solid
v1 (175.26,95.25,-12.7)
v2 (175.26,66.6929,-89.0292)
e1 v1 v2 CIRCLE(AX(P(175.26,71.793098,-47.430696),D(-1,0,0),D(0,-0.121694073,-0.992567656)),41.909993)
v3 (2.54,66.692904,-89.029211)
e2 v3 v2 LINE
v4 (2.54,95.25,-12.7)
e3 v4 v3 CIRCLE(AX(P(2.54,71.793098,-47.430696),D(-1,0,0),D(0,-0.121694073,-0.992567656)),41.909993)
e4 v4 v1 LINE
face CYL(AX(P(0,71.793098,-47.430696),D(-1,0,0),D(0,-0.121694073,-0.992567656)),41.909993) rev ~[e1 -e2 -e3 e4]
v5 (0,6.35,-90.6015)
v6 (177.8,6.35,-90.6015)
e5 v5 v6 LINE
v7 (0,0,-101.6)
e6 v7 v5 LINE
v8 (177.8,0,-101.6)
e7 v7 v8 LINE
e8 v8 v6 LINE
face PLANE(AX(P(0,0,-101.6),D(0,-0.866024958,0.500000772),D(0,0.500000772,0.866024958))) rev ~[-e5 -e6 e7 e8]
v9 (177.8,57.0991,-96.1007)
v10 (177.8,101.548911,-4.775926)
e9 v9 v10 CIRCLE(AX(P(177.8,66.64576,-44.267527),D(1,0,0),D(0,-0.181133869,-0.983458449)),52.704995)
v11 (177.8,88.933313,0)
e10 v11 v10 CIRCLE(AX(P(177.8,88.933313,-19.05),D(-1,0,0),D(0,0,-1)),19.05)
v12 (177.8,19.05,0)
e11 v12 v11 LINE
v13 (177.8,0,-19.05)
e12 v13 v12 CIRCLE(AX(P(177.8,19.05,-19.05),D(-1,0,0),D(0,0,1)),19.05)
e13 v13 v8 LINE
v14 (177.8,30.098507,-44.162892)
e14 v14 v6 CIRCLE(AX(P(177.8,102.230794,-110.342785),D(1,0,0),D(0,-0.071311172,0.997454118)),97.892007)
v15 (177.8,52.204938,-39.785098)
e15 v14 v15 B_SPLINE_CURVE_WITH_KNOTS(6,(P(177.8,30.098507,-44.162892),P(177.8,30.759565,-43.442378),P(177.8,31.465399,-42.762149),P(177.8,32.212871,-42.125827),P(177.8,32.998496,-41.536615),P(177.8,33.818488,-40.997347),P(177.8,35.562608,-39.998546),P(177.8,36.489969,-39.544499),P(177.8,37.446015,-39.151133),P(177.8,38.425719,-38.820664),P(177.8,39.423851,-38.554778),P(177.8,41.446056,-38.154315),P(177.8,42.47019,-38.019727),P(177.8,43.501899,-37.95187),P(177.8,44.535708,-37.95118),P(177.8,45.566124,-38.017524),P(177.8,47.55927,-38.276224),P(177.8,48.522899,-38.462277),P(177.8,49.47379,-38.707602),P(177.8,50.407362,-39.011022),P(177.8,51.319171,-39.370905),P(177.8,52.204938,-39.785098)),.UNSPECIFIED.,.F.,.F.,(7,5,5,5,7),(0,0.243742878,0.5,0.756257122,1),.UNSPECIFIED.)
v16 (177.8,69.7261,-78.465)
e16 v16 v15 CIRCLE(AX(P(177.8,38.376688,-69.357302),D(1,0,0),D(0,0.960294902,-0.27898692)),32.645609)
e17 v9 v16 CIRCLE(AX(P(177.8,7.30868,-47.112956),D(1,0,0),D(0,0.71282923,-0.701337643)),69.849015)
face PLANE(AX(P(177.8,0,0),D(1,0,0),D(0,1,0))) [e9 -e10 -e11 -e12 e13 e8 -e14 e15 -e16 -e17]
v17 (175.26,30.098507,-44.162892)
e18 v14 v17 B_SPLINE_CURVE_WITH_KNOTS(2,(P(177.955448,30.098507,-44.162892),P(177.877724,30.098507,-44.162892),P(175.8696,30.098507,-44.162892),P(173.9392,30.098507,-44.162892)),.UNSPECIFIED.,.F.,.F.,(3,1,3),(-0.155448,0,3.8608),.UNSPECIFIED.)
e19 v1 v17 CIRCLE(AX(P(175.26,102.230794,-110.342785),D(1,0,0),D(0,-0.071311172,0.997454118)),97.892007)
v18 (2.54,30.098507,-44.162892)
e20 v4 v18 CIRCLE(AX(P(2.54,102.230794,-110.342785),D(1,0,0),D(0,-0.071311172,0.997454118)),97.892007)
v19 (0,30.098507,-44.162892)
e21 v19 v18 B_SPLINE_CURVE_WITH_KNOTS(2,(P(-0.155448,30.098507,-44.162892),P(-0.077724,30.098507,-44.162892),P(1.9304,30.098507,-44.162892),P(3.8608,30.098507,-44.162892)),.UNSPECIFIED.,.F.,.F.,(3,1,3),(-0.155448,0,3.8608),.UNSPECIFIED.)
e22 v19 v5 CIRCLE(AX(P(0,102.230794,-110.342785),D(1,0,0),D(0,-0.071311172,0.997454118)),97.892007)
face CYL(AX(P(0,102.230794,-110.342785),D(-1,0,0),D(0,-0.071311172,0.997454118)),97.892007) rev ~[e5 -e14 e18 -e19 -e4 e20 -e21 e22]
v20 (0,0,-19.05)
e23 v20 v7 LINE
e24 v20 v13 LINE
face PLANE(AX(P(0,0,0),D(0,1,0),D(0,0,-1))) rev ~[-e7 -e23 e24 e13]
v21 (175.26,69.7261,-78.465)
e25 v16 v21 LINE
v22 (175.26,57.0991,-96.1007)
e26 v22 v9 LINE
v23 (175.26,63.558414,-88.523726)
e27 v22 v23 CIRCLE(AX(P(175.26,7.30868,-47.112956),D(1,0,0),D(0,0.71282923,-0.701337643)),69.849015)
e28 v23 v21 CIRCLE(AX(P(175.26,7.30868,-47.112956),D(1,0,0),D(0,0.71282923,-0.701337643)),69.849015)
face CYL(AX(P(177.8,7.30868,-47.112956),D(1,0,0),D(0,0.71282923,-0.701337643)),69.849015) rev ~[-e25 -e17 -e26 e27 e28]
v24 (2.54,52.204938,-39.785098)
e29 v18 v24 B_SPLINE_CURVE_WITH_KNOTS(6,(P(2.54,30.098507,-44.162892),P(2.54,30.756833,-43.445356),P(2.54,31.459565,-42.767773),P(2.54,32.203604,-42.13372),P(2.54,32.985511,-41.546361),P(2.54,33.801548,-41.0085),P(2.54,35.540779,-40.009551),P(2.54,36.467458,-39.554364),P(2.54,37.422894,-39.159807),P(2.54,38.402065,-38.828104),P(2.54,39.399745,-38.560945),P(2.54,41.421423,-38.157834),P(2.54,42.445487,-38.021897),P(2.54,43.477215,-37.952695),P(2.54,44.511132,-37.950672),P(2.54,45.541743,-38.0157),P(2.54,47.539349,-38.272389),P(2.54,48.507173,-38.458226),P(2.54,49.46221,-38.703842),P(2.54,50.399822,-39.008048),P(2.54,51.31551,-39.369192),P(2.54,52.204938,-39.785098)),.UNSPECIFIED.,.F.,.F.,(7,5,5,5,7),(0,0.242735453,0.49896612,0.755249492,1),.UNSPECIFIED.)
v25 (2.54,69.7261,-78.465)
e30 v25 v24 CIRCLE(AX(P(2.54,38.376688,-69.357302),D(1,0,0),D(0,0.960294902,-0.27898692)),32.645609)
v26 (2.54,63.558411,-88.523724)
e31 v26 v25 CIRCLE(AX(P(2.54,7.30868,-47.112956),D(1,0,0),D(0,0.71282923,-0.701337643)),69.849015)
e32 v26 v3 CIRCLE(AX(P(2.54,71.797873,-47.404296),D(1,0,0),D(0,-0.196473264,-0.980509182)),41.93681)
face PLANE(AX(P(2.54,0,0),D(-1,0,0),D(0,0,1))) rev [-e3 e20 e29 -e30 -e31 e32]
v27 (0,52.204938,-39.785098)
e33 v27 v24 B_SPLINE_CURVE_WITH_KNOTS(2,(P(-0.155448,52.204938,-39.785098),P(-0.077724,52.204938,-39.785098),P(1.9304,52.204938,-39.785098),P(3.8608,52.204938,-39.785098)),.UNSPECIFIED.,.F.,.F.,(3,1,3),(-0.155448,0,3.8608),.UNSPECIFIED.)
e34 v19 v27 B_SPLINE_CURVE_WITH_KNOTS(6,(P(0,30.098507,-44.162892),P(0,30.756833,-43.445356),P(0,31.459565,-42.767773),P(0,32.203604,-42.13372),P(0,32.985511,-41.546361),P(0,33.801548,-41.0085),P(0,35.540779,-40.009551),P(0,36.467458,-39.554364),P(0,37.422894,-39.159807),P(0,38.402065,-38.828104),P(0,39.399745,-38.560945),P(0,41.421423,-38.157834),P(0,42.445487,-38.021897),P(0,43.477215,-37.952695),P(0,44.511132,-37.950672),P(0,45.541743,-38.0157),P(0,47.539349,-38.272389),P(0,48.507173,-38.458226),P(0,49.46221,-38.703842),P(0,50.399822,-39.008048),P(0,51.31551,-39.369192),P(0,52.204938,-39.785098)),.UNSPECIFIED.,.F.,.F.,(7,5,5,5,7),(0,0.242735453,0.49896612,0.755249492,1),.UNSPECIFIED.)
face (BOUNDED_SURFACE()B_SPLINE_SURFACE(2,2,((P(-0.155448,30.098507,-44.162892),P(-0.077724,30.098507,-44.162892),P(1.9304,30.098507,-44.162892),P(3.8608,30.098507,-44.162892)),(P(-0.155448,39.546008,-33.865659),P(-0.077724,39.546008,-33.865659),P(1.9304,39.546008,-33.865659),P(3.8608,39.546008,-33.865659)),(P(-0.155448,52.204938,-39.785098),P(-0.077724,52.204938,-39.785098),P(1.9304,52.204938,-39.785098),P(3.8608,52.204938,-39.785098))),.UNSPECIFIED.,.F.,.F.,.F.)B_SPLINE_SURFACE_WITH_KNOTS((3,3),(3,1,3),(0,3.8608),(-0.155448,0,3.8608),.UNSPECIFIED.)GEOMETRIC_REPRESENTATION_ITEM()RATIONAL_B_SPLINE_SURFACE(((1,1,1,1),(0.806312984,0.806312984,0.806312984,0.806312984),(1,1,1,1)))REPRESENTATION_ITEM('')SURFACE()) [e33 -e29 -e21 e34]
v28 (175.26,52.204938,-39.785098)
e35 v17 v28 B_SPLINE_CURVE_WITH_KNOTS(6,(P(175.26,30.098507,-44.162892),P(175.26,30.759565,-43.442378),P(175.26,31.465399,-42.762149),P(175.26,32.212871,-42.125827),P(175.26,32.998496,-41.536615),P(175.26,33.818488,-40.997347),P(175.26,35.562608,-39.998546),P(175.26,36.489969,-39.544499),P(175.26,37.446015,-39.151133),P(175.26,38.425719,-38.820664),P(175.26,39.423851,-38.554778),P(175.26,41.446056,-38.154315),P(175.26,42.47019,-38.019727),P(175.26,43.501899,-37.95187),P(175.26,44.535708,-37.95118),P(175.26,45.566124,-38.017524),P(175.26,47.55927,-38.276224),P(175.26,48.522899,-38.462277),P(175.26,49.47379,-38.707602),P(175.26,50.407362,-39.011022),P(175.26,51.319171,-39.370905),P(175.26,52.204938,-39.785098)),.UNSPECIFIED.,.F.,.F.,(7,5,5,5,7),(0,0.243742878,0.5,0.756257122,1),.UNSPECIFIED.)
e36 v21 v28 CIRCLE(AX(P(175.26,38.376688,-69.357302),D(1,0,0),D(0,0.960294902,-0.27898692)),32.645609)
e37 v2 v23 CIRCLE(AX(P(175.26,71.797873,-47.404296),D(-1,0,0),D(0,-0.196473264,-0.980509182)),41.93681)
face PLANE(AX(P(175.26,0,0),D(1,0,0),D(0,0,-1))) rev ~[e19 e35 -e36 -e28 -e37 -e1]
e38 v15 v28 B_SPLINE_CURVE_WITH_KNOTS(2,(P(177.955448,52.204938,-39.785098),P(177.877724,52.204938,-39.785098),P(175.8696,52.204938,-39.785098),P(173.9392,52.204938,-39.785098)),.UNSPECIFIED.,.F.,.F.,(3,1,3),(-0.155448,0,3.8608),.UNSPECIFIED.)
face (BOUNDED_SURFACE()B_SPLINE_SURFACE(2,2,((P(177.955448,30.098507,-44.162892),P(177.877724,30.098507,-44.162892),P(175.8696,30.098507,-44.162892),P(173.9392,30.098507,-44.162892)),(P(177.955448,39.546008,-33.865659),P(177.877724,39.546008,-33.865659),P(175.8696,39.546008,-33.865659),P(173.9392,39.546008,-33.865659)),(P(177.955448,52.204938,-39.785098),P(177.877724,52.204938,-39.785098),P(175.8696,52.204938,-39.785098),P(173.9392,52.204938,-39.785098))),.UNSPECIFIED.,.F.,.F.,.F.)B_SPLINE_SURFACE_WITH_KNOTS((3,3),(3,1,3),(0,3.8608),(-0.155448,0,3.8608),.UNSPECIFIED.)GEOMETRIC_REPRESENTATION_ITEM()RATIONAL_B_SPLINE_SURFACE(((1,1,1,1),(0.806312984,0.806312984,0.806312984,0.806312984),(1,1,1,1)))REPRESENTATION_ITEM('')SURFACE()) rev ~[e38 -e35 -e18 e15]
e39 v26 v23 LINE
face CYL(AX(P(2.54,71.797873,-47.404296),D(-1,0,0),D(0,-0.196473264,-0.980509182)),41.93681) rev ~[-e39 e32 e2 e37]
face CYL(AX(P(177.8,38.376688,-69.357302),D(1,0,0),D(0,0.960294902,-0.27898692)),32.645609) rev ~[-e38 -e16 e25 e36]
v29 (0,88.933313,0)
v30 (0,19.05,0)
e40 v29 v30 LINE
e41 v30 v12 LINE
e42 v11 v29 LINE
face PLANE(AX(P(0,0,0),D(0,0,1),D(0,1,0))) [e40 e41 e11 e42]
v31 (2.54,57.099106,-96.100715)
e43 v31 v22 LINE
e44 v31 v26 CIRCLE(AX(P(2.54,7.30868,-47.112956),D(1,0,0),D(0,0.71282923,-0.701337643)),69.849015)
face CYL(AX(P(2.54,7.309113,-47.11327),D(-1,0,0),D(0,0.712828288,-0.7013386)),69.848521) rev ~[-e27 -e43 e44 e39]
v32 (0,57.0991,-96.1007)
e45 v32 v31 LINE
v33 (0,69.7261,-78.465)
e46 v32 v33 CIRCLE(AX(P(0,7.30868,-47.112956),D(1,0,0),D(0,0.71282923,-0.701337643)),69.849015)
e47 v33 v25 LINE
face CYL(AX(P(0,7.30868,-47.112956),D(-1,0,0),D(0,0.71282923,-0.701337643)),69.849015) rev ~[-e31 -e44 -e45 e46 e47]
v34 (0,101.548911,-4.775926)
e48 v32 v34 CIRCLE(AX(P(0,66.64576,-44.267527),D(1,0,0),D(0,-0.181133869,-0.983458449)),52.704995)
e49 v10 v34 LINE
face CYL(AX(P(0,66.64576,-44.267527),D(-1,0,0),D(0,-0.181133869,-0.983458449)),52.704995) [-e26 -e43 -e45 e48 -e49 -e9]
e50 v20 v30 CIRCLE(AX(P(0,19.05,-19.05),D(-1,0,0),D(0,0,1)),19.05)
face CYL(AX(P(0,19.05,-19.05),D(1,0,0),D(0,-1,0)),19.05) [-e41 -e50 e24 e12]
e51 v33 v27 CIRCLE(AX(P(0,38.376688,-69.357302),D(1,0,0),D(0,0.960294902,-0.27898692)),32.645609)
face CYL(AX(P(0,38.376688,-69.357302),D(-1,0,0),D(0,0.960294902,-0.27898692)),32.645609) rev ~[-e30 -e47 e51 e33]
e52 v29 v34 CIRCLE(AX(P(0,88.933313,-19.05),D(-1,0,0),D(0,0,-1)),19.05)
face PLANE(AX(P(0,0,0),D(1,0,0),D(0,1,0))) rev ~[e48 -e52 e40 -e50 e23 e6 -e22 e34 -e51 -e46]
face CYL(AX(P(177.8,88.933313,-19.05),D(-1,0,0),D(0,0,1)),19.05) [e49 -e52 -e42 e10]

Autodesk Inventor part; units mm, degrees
ref_plane "YZ Plane" through (0, 0, 0) normal (1, 0, 0) x (0, 1, 0)
ref_plane "XZ Plane" through (0, 0, 0) normal (0, 1, 0) x (-1, 0, 0)
sketch "Sketch1" plane through (0, 0, 0) normal (1, 0, 0) x (0, 1, 0)
  line L0 (0, 0) -> (95.25, 0)
  line L1 (0, 0) -> (0, -101.6)
  line L2 (0, -101.6) -> (6.35, -90.6015)
  line L3 (0, -101.6) -> (12.7, -101.6) construction
  arc A0 (66.6929, -89.0292) -> (95.25, -12.7) centre (71.7931, -47.4307) ccw
  arc A1 (57.0991, -96.1007) -> (95.25, 0) centre (66.6458, -44.2676) ccw
  arc A2 (57.0991, -96.1007) -> (66.6929, -89.0292) centre (51.9568, -79.0806) ccw
  arc A3 (95.25, -12.7) -> (6.35, -90.6015) centre (102.2308, -110.3428) ccw
  dimension "d18" = 101.6
  dimension "d20" = 12.7
  dimension "d21" = 60
  dimension "d27" = 41.91
  dimension "d28" = 52.705
  dimension "d29" = 17.78
  dimension "d30" = 57.099
  dimension "d31" = 66.6458
  dimension "d32" = 71.7931
  dimension "d33" = 95.25
  dimension "d34" = 66.6929
  dimension "d35" = 12.7
  dimension "d36" = 96.1007
  dimension "d38" = 74.276
extrude "Extrusion1" add sketch "Sketch1" along normal blind 177.8
sketch "Sketch2" plane through (177.8, 0, 0) normal (1, 0, 0) x (0, 0, -1)
  arc A0 (89.0292, 66.6929) -> (12.7, 95.25) centre (47.4307, 71.7931) ccw projected
  arc A1 (12.7, 95.25) -> (90.6015, 6.35) centre (110.3428, 102.2308) ccw projected
  line L0 (0, 95.25) -> (0, 0) projected
  arc A2 (96.1007, 57.0991) -> (89.0292, 66.6929) centre (79.0806, 51.9568) ccw projected
  line L1 (0, 58.8778) -> (0, 95.25)
  line L2 (0, 0) -> (101.6, 0) projected
  arc A3 (78.465, 69.7261) -> (36.7184, 37.715) centre (69.3573, 38.3767) ccw
  arc A4 (96.1007, 57.0991) -> (78.465, 69.7261) centre (47.1123, 7.3079) ccw
  line L3 (0, 58.8778) -> (36.7184, 37.715)
  arc A5 (96.1007, 57.0991) -> (0, 95.25) centre (44.2676, 66.6458) ccw
  arc A6 (96.1007, 57.0991) -> (0, 95.25) centre (44.2676, 66.6458) ccw projected
  arc A7 (12.7, 95.25) -> (36.7184, 37.715) centre (110.3428, 102.2308) ccw
  arc A8 (89.0292, 66.6929) -> (12.7, 95.25) centre (47.4307, 71.7931) ccw
  arc A9 (96.1007, 57.0991) -> (89.0292, 66.6929) centre (79.0806, 51.9568) ccw
  dimension "d49" = 21.1628
  dimension "d50" = 32.6457
  dimension "d51" = 69.85
  dimension "d52" = 16.8716
  dimension "d53" = 59.3379
ref_plane "Work Plane1" through (88.9, 0, 0) normal (1, 0, 0) x (0, 0, -1)
extrude "Extrusion2" add sketch "Sketch2" against normal blind 2.54
fillet "Fillet3" radius 19.05 1 edges at (176.53, 37.715, -36.7184)
mirror "Mirror1" about plane through (88.9, 0, 0) normal (1, 0, 0) of "Extrusion2", "Fillet3"
fillet "Fillet2" radius 19.05 2 edges at (88.9, 0, 0) (88.9, 95.25, 0)
sketch "Sketch3" plane through (2.54, 71.7931, -47.4307) normal (1, 0, 0) x (0, -0.3504094, -0.9365966)
  arc A0 (50.7331, 3.2921) -> (40.7482, 9.7997) centre (36.594, -7.4882) ccw projected
  arc A1 (40.7482, 9.7997) -> (-40.7482, 9.7997) centre (0, 0) ccw projected
  arc A2 (50.7331, 3.2921) -> (29.7909, 8.9388) centre (22.298, -60.5081) ccw projected
  arc A3 (50.7331, 3.2921) -> (-50.3771, 12.9226) centre (-1.1589, -5.9293) ccw projected
  arc A4 (50.7331, 3.2921) -> (40.7482, 9.7997) centre (36.594, -7.4882) ccw
  arc A5 (41.3731, 6.6868) -> (40.7482, 9.7997) centre (0, 0) ccw
  arc A6 (50.7331, 3.2921) -> (29.7909, 8.9388) centre (22.298, -60.5081) ccw projected
  arc A7 (-35.8187, -21.7593) -> (-43.5602, -37.2333) centre (22.298, -60.5081) ccw
  arc A8 (50.7331, 3.2921) -> (41.3731, 6.6868) centre (22.298, -60.5081) ccw
  point P0 (-19.2665, -83.8613)
extrude "Extrusion3" add sketch "Sketch3" along normal up to next
sketch "Sketch4" plane through (177.8, 0, 0) normal (1, 0, 0) x (0, 0, -1)
  arc A0 (96.1007, 57.0991) -> (4.7759, 101.5489) centre (44.2676, 66.6458) ccw projected
  line L0 (19.05, 0) -> (101.6, 0) projected
  arc A1 (96.1007, 57.0991) -> (4.7759, 101.5489) centre (44.2676, 66.6458) ccw projected
  point P0 (0, 0)
  point P1 (44.2676, 119.3508)
  dimension "d57" = 119.3508
properties part number "plowV2"
